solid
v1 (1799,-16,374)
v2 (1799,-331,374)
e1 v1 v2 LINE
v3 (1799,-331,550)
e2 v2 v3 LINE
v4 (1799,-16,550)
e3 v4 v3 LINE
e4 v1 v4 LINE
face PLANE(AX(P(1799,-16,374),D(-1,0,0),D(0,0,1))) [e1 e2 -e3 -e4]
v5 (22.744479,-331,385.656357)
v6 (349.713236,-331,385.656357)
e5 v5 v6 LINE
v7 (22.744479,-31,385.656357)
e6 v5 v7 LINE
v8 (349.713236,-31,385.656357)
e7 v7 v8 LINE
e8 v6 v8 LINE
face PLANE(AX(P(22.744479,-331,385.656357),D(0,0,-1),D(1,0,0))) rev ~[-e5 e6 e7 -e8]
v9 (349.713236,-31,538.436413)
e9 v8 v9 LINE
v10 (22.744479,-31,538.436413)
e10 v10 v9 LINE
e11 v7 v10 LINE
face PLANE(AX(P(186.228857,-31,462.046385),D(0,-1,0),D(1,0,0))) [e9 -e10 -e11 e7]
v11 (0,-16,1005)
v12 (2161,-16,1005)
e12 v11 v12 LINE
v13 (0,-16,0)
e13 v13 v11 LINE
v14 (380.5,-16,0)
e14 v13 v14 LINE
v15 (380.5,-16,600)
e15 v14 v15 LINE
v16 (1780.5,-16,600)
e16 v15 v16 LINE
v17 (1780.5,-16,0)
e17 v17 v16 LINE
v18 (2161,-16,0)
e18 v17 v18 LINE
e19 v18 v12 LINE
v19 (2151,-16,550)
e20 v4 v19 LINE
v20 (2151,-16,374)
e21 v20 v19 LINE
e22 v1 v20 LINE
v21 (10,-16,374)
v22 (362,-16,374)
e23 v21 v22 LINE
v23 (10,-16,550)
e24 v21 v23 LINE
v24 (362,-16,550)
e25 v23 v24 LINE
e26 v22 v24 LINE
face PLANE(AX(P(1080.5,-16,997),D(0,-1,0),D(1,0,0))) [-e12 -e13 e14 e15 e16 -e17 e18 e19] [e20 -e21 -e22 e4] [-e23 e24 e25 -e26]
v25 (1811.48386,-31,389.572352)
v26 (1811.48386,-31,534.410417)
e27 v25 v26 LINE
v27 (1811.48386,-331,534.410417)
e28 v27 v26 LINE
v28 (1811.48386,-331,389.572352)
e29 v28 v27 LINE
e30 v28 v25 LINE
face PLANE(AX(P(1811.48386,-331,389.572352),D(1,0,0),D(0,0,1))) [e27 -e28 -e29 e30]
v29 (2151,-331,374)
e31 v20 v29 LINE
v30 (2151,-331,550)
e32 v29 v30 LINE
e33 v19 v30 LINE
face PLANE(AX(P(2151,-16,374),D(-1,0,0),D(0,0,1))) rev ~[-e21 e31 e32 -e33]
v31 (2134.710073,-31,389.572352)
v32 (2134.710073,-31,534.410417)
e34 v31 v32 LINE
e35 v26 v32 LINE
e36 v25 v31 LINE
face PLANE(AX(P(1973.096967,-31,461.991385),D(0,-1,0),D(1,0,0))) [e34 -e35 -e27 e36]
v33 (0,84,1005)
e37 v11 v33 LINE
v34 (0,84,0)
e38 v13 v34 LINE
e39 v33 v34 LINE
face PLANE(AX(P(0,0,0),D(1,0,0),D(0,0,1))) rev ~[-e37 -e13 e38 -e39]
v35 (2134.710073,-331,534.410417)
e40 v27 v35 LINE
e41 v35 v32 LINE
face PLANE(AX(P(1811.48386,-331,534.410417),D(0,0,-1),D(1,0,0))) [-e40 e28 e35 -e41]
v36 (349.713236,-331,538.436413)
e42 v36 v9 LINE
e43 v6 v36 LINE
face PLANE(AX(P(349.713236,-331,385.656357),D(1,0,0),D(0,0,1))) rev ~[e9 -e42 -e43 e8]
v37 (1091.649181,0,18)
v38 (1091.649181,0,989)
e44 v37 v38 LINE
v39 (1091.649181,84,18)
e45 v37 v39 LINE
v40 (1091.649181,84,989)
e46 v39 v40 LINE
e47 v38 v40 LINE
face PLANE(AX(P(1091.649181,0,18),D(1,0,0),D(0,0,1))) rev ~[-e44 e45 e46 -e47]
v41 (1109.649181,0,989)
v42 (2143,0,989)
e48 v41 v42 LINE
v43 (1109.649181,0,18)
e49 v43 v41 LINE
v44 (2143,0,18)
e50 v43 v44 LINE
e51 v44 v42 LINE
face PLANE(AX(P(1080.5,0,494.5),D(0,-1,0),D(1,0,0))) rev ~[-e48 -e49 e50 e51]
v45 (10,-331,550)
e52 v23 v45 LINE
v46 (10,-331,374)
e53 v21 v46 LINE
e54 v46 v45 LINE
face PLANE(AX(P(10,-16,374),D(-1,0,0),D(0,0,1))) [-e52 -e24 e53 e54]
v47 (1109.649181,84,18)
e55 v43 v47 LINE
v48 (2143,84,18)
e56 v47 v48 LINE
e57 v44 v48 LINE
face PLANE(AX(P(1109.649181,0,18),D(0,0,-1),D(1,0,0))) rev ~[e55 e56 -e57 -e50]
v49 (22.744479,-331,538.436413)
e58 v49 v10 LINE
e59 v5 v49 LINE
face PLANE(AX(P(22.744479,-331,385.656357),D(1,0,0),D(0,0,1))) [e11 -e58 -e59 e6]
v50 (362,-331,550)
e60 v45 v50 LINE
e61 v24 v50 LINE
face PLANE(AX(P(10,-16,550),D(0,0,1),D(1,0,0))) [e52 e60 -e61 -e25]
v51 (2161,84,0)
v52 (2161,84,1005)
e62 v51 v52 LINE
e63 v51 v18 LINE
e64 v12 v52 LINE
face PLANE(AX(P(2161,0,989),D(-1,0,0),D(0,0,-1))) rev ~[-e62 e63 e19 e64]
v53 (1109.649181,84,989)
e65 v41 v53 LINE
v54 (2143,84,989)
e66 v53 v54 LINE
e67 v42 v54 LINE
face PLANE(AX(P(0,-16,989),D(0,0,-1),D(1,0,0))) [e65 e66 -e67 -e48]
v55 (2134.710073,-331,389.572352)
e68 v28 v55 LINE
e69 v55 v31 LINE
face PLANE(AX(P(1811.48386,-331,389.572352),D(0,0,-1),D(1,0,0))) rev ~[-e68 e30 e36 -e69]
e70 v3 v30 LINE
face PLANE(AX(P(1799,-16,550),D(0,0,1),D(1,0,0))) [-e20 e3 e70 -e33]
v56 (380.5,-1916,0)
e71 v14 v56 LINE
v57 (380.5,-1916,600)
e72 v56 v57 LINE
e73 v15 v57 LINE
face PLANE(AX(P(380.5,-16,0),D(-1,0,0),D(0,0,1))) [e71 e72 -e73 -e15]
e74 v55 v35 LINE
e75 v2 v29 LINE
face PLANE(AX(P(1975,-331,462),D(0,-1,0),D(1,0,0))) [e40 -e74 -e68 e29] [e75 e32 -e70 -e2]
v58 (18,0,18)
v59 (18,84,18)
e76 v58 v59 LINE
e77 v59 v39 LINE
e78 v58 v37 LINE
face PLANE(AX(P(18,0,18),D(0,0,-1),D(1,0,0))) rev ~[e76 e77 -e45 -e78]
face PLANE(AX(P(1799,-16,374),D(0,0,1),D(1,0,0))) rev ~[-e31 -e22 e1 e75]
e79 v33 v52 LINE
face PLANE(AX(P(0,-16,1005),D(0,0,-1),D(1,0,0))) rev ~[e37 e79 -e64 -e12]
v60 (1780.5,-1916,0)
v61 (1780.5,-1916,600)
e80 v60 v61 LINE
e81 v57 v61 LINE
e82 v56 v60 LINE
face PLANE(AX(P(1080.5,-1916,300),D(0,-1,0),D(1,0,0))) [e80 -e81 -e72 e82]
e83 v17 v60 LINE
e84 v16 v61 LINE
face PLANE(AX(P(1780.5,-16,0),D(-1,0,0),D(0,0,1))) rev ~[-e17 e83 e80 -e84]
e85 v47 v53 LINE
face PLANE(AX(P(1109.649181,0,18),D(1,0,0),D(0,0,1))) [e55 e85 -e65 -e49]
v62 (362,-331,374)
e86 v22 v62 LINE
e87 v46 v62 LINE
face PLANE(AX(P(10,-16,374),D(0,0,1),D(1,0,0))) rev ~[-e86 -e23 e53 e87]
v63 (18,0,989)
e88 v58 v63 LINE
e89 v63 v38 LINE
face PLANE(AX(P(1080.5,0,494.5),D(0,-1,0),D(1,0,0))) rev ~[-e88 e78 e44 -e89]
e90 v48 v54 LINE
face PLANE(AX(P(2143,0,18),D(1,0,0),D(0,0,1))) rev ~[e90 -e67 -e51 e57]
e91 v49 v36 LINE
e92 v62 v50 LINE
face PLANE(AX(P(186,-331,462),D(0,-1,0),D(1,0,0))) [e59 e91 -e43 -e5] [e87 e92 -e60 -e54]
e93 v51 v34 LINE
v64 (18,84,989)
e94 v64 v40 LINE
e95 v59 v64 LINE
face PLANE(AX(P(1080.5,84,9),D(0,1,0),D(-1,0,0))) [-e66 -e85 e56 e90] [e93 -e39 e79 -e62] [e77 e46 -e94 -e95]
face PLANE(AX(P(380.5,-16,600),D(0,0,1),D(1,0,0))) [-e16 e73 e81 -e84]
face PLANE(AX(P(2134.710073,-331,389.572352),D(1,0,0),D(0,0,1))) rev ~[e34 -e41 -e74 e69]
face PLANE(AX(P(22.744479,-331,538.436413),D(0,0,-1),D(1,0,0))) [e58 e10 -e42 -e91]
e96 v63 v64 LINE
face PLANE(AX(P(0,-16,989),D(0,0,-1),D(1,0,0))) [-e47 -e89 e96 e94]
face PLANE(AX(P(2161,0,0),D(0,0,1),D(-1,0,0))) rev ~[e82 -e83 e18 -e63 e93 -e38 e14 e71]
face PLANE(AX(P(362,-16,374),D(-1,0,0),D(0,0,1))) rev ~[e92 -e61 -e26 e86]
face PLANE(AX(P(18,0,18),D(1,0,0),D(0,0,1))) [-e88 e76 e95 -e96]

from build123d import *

# Parameters (mm, degrees)
F0_W      = 2161
F0_H      = 989
F1_DEPTH  = 16
F2_W      = 1400
F2_H      = 600
F3_DEPTH  = 1900
F4_W      = 352
F4_H      = 176
F5_DEPTH  = 315
F6_W      = 2161
F6_H      = 16
F7_DEPTH  = 100
F8_W      = 18
F8_H      = 971
F9_DEPTH  = 84
F11_W     = 326.9687574357
F11_H     = 152.7800559998
F12_DEPTH = 300
F13_W     = 323.2262134552
F13_H     = 144.838064909
F14_DEPTH = 300


# Not quite as in the source:
# - a feature names something its author has since deleted; it is built from what else it names


with BuildPart() as f1:
    # F0 (on Front) → F1 (new body)
    with BuildSketch(Plane.XZ):
        with Locations((1080.5, 494.5)):
            Rectangle(F0_W, F0_H)
    extrude(amount=F1_DEPTH)

    # F2 (on face) → F3 (join)
    with BuildSketch(Plane.XZ.offset(16)):
        with Locations((1080.5, 300)):
            Rectangle(F2_W, F2_H)
    extrude(amount=F3_DEPTH)

    # F4 (on face) → F5 (join)
    with BuildSketch(Plane.XZ.offset(16)):
        with Locations((186, 462)):
            Rectangle(F4_W, F4_H)
        with Locations((1975, 462)):
            Rectangle(F4_W, F4_H)
    extrude(amount=F5_DEPTH)

    # F6 (on face) → F7 (join)
    with BuildSketch(Plane.XZ.offset(16)):
        with Locations((1080.5, 997)):
            Rectangle(F6_W, F6_H)
    extrude(amount=-F7_DEPTH)

    # F8 (on face) → F9 (join)
    with BuildSketch(Plane(origin=(0, 0, 0), x_dir=(-1, 0, 0), z_dir=(0, 1, 0))):
        Polygon((-2161, 18), (-2161, 0), (0, 0), (0, 18), (-18, 18), (-1091.649181366, 18), (-1109.649181366, 18), (-1478.5152740479, 18), (-1496.5152740479, 18), (-2143, 18), align=None)
        with Locations((-2152, 503.5)):
            Rectangle(F8_W, F8_H)
        with Locations((-9, 503.5)):
            Rectangle(F8_W, F8_H)
        with Locations((-1100.649181366, 503.5)):
            Rectangle(F8_W, F8_H)
    extrude(amount=F9_DEPTH)

    # F11 (on face) → F12 (cut)
    with BuildSketch(Plane.XZ.offset(331)):
        with Locations((186.2288573757, 462.0463848114)):
            Rectangle(F11_W, F11_H)
    extrude(amount=-F12_DEPTH, mode=Mode.SUBTRACT)

    # F13 (on face) → F14 (cut)
    with BuildSketch(Plane.XZ.offset(331)):
        with Locations((1973.0969667435, 461.9913846254)):
            Rectangle(F13_W, F13_H)
    extrude(amount=-F14_DEPTH, mode=Mode.SUBTRACT)


solid = f1.part
